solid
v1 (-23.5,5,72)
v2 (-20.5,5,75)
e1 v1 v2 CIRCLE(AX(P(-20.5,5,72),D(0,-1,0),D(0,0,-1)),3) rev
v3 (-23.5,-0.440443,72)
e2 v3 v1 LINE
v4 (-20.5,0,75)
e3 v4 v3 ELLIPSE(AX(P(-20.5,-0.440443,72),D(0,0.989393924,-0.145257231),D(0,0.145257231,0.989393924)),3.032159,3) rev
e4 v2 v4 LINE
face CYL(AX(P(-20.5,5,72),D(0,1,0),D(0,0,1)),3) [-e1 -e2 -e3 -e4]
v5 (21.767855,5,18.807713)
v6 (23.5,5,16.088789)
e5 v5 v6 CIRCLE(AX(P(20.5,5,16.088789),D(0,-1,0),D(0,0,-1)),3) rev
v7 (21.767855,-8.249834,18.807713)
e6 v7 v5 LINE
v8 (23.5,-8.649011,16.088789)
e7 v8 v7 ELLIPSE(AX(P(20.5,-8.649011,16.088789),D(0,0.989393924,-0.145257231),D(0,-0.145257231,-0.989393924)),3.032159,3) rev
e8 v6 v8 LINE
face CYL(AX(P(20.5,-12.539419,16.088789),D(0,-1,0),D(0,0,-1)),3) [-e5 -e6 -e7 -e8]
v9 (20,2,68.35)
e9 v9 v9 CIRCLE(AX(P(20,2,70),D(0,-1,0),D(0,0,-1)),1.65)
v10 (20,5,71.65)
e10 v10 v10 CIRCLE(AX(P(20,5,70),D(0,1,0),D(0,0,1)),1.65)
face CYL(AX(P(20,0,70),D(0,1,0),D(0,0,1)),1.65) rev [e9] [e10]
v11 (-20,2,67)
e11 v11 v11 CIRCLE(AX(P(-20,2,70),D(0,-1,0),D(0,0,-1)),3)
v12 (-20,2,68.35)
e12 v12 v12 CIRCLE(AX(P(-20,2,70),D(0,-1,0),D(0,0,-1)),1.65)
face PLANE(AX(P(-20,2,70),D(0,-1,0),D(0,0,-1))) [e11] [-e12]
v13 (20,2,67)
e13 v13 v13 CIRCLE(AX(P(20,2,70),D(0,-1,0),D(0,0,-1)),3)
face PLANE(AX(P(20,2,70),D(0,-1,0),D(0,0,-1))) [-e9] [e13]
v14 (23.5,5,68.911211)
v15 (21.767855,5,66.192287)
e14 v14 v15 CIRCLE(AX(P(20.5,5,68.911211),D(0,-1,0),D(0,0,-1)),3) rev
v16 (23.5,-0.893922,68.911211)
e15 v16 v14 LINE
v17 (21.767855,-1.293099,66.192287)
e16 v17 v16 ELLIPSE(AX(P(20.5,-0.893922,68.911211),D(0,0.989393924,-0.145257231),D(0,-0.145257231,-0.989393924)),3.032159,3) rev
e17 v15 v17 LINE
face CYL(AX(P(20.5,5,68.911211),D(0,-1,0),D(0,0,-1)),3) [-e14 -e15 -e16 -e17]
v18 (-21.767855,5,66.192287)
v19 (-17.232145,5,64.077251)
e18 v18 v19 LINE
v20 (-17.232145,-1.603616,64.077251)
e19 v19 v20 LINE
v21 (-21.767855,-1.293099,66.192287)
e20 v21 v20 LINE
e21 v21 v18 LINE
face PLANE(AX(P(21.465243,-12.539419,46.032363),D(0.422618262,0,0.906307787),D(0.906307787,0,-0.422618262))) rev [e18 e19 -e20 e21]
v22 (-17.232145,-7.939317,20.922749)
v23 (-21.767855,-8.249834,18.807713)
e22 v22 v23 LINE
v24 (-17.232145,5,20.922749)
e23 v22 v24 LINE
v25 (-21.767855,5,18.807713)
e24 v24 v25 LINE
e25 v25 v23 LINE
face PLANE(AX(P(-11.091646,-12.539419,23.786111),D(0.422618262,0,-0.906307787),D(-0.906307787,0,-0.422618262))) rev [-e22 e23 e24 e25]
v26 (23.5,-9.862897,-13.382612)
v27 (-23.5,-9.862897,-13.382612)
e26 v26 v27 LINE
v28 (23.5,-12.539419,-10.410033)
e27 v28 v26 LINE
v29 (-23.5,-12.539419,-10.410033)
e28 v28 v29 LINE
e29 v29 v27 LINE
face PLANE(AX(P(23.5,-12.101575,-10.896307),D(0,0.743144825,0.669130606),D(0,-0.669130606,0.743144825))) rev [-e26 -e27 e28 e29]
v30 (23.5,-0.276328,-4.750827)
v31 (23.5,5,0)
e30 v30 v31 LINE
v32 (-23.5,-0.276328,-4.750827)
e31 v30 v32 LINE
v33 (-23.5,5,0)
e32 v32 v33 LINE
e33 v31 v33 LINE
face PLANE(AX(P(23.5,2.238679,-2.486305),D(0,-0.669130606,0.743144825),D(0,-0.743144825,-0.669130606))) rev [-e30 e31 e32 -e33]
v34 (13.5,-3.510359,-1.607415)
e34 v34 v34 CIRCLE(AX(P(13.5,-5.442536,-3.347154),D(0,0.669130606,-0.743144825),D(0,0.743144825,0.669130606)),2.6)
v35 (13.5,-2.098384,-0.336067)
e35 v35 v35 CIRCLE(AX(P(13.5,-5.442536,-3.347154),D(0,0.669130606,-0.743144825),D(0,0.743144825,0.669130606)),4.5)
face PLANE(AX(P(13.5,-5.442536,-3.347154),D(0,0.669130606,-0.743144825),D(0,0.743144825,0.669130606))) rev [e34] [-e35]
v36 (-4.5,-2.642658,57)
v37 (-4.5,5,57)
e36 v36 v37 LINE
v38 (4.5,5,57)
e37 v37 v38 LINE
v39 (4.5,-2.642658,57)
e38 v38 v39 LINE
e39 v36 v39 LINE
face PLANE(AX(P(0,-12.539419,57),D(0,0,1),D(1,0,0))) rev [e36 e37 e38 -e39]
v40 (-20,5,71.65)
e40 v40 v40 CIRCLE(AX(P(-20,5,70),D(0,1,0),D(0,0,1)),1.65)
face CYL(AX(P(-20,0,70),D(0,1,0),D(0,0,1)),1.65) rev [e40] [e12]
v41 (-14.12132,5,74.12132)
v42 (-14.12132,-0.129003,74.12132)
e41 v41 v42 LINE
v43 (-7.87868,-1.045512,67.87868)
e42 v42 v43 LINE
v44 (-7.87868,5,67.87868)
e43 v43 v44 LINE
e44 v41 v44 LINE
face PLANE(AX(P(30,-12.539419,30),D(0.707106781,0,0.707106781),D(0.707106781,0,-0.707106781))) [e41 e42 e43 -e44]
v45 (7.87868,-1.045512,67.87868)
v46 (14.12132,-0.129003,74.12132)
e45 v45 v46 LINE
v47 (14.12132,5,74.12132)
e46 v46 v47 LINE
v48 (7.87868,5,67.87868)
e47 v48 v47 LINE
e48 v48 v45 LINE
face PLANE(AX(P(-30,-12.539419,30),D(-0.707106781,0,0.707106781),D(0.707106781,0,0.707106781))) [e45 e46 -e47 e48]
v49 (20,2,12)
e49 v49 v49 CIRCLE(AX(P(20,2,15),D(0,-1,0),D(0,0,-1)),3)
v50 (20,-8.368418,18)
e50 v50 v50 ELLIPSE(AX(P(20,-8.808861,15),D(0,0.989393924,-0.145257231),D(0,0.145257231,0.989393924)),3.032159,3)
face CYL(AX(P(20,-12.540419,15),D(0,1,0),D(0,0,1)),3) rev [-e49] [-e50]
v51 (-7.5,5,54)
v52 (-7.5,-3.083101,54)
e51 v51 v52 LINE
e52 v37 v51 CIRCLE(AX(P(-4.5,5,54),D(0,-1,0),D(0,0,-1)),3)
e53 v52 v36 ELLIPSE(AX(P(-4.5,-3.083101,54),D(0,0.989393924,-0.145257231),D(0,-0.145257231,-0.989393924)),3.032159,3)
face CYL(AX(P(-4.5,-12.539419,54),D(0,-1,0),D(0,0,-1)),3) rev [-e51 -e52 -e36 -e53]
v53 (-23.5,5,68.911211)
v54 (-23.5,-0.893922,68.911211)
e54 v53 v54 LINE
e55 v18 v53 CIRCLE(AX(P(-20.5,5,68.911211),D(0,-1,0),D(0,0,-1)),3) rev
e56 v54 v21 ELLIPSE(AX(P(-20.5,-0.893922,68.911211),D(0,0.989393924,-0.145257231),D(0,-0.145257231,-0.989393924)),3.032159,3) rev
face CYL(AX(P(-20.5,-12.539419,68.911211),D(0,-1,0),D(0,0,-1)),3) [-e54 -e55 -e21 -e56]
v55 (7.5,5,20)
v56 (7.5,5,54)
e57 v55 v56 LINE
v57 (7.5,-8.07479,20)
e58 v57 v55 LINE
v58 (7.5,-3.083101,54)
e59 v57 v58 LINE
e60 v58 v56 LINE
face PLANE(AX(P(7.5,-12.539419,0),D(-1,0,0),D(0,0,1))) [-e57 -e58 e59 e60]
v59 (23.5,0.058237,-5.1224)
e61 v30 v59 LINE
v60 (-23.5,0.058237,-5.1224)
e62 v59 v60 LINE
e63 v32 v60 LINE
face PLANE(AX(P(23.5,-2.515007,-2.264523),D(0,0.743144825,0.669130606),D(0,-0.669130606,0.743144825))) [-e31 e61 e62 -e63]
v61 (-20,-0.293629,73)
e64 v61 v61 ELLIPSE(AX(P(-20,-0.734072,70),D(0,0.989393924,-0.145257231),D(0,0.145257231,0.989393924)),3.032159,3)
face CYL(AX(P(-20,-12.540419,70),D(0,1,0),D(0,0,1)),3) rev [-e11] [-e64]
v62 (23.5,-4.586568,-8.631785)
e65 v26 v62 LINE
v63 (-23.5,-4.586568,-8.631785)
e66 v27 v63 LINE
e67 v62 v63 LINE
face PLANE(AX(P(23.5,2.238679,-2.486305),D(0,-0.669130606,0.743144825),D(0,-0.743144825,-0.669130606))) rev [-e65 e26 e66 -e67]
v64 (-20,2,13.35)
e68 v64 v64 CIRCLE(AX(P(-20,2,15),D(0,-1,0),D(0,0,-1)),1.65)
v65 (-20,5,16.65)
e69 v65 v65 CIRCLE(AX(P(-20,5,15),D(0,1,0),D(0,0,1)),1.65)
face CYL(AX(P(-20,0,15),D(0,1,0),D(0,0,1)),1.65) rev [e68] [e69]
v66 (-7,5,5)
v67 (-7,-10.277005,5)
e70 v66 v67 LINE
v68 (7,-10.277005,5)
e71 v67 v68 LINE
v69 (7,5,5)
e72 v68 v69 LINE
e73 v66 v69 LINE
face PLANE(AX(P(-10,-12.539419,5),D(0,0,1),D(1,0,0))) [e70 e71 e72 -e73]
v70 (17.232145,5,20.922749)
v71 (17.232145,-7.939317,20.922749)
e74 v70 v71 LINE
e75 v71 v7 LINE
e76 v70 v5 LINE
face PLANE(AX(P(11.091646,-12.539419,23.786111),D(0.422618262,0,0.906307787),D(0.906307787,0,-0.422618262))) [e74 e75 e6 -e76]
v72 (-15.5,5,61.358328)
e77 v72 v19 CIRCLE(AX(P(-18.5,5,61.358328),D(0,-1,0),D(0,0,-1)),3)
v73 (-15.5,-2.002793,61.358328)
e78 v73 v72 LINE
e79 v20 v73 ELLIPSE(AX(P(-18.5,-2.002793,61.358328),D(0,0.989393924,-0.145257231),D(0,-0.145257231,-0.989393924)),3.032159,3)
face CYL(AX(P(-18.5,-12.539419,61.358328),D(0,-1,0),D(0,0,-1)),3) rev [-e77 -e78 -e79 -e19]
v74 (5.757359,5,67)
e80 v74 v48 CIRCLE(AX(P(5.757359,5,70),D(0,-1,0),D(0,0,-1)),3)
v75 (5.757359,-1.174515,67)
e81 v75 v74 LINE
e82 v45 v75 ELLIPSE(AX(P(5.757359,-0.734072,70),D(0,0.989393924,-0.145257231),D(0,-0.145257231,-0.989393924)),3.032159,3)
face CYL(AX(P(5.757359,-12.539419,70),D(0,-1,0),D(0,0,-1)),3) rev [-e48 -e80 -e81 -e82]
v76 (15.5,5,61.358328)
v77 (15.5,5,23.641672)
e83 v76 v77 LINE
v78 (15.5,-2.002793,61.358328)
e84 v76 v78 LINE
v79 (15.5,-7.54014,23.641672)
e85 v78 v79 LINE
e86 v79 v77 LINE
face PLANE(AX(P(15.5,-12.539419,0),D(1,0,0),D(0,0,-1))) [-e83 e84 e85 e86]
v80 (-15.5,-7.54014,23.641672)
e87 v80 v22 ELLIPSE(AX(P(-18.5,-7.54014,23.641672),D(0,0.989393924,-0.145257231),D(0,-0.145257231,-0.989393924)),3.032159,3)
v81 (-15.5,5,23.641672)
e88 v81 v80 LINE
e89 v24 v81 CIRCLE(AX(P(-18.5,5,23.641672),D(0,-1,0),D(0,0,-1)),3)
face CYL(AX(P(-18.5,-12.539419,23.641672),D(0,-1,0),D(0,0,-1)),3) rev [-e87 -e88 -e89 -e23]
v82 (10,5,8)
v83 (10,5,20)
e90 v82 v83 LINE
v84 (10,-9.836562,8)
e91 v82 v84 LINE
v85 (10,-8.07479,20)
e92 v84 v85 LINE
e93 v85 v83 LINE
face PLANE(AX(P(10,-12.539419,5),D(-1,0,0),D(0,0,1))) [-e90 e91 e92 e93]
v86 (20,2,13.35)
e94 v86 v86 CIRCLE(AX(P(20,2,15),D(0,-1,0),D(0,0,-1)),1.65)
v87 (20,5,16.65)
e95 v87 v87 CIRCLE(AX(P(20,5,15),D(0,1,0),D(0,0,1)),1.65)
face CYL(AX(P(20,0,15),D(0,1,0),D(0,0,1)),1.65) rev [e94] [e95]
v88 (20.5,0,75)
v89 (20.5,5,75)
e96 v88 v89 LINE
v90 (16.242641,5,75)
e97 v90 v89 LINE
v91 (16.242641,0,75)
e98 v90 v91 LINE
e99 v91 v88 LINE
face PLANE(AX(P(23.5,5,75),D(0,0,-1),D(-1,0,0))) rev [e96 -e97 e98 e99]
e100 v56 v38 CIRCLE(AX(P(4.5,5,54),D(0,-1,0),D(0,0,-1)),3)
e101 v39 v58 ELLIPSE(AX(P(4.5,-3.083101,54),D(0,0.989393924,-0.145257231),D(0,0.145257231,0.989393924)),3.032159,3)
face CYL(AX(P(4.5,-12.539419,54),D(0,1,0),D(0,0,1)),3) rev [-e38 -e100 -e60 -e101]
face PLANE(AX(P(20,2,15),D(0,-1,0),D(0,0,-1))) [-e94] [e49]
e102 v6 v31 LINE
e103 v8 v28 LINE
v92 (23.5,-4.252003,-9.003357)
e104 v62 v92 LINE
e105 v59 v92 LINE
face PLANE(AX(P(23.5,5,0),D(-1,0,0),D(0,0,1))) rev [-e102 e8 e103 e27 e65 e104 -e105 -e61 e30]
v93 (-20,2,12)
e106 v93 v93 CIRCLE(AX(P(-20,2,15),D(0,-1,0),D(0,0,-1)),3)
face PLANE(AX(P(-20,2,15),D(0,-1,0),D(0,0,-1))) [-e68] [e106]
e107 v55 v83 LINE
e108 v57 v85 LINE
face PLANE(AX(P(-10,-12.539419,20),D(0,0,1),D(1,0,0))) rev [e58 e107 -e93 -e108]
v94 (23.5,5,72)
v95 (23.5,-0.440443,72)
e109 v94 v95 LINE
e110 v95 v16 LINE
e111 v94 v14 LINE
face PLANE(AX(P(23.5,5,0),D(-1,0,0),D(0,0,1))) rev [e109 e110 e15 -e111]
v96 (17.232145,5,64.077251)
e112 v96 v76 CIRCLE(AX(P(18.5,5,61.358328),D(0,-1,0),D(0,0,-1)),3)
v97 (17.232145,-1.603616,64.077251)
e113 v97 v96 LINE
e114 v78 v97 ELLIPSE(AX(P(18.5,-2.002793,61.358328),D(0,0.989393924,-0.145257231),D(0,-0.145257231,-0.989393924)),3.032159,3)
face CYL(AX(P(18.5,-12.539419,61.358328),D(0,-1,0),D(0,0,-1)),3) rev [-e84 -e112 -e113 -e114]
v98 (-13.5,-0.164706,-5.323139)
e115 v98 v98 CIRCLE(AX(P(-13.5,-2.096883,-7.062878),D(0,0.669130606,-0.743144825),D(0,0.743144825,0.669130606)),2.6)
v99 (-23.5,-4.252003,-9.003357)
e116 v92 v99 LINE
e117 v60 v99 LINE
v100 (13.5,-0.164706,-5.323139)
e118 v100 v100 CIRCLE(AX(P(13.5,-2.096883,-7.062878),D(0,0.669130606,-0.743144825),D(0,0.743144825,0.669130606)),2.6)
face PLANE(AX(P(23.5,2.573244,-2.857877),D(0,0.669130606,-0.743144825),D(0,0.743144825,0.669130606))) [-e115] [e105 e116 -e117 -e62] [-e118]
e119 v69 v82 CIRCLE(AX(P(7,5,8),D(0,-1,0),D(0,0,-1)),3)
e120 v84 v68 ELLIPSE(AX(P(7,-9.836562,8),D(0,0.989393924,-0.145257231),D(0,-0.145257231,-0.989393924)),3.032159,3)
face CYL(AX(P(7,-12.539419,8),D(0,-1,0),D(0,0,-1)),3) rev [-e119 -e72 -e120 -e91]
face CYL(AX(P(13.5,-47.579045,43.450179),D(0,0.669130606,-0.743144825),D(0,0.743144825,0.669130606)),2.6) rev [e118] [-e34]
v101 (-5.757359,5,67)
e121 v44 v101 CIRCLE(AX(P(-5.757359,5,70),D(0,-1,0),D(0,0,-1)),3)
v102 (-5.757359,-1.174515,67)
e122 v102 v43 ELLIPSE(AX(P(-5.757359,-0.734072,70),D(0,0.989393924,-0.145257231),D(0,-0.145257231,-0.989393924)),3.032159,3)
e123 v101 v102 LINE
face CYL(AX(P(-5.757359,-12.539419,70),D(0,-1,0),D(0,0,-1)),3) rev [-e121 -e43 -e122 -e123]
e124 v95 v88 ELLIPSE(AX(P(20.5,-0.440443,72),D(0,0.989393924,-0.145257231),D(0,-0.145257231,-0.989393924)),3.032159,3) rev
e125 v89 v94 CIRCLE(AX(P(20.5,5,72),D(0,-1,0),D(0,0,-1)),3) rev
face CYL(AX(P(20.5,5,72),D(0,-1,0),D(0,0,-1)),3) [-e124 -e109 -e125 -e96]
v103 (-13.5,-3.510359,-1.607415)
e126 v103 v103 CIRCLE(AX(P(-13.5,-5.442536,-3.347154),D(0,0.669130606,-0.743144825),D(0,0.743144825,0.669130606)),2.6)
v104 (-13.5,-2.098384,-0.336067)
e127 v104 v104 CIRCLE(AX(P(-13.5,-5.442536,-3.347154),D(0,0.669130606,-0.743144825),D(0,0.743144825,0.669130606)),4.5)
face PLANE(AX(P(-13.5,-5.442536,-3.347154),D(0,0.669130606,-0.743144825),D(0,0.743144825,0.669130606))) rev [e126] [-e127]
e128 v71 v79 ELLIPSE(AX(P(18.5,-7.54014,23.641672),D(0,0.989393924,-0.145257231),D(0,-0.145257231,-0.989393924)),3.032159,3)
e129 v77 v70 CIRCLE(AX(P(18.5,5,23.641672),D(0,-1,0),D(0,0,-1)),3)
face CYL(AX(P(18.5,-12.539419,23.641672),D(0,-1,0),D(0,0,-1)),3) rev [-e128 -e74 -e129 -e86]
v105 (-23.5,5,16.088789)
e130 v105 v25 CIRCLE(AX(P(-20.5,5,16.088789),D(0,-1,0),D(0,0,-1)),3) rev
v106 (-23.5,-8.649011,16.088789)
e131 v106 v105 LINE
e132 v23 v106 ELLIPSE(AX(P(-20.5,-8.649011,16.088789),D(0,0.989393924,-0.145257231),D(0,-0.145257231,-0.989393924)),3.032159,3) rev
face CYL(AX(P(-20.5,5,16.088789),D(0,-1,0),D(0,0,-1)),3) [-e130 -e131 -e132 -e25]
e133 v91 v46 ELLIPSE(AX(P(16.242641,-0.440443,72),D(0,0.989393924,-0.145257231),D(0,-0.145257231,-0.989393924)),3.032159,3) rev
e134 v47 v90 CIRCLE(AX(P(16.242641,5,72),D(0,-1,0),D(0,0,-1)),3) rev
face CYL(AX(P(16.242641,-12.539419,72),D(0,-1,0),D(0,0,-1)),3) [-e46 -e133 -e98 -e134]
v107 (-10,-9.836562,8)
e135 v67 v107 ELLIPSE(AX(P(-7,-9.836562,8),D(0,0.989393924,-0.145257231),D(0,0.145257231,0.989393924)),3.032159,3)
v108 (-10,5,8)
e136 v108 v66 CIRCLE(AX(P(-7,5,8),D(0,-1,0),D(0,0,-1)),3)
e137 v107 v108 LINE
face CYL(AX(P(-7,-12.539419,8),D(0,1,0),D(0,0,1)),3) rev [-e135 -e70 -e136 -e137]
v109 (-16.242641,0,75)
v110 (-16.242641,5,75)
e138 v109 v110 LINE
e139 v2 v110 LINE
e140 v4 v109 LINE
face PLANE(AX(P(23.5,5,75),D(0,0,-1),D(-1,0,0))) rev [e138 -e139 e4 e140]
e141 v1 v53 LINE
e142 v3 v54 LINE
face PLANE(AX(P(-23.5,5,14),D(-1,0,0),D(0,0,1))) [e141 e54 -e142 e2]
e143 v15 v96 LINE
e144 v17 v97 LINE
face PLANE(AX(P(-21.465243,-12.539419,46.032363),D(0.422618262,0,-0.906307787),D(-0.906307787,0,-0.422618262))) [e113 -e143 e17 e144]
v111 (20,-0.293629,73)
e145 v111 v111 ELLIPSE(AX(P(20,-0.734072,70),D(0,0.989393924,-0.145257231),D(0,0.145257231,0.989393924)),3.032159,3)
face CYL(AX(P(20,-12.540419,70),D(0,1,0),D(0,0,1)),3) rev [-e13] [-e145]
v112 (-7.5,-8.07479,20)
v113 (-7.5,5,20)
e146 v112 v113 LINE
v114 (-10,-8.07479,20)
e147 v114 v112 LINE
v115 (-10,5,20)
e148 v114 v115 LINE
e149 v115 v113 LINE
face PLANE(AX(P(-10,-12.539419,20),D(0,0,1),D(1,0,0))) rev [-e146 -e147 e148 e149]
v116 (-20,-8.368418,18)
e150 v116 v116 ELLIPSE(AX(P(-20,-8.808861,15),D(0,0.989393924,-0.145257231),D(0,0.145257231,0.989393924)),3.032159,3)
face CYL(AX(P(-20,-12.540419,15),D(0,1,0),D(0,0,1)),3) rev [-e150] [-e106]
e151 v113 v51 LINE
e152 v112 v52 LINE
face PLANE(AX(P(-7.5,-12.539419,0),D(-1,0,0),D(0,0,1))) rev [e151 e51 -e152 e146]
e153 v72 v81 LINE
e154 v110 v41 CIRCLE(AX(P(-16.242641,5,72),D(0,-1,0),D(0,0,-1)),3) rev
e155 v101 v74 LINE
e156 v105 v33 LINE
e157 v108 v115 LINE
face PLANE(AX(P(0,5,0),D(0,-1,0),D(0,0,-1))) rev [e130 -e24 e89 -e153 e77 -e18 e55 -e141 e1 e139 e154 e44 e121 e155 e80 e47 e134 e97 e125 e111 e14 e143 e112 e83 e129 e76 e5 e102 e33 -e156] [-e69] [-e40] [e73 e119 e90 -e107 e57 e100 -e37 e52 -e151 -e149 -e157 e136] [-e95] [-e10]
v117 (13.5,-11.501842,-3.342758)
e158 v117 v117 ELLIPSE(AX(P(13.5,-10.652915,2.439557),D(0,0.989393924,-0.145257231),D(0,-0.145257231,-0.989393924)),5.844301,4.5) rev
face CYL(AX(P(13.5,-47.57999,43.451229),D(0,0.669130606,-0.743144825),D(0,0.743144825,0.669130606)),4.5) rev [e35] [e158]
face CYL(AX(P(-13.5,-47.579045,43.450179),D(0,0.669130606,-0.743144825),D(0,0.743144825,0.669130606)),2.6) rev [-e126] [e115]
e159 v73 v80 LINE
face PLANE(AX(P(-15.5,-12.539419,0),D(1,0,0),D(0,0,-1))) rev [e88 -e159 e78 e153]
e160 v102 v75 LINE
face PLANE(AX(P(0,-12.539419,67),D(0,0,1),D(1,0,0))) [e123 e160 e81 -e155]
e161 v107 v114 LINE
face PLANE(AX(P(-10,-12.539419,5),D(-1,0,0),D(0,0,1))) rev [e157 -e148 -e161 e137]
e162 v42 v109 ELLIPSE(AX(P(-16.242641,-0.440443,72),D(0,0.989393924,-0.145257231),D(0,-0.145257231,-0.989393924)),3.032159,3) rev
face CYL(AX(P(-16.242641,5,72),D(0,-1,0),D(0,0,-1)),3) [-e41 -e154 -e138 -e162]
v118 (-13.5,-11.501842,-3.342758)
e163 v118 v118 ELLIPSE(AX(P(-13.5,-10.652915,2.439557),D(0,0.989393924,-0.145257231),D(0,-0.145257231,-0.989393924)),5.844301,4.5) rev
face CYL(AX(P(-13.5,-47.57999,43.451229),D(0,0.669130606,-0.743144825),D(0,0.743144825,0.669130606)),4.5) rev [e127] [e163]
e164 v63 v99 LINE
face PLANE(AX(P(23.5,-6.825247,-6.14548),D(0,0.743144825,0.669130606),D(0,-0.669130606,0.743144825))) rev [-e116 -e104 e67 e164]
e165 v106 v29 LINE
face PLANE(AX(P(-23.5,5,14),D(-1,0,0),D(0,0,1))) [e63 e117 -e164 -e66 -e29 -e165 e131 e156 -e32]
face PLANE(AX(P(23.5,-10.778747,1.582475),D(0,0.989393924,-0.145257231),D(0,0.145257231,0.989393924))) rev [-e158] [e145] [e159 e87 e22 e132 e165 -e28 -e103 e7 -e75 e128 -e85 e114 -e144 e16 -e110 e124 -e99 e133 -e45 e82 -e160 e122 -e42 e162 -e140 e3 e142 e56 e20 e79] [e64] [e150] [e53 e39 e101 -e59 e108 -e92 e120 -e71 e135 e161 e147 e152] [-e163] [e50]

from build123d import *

# Parameters (mm, degrees)
EXTRUDE_2_DEPTH     = 5
SKETCH_3_R          = 1.65
CUT_EXTRUDE_1_DEPTH = 79.754364958
EXTRUDE_3_DEPTH     = 23.5
SKETCH_6_R          = 2.6
CUT_EXTRUDE_3_DEPTH = 83.719354566
CUT_EXTRUDE_4_REACH = 89.719
CUT_EXTRUDE_START   = -5
SKETCH_7_R          = 4.5
CUT_EXTRUDE_5_REACH = 85.529
CUT_EXTRUDE_START_2 = 3
SKETCH_8_R          = 3
CUT_EXTRUDE_2_DEPTH = 81.528760183
FILLET_1_R          = 3


with BuildPart() as part:
    # 草图2 → 凸台-拉伸2 (new body)
    with BuildSketch(Plane(origin=(0, 0, 0), x_dir=(1, 0, 0), z_dir=(0, 1, 0))):
        Polygon((0, 0), (23.5, 0), (23.5, -14), (23.5, -75), (0, -75), align=None)
    extrude_2 = extrude(amount=EXTRUDE_2_DEPTH)

    # 镜向1: 凸台-拉伸2 across plane
    add(extrude_2.mirror(Plane(origin=(0, 5, 75), x_dir=(0, 0, 1), z_dir=(1, 0, 0))))

    # 草图3 → 切除-拉伸1 (cut, through all)
    with BuildSketch(Plane(origin=(0, 5, 0), x_dir=(1, 0, 0), z_dir=(0, 1, 0))):
        with Locations(Location((-20, -15, 0), (0, 0, 270))):
            Circle(SKETCH_3_R)
        with Locations(Location((20, -15, 0), (0, 0, 270))):
            Circle(SKETCH_3_R)
        with Locations(Location((-20, -70, 0), (0, 0, 270))):
            Circle(SKETCH_3_R)
        with Locations(Location((20, -70, 0), (0, 0, 270))):
            Circle(SKETCH_3_R)
    extrude(amount=-CUT_EXTRUDE_1_DEPTH, mode=Mode.SUBTRACT)

    # 草图5 → 凸台-拉伸3 (add, symmetric)
    with BuildSketch(Plane(origin=(0, 0, 0), x_dir=(0, 0, -1), z_dir=(1, 0, 0))):
        Polygon((-75, 0), (10.410032825, -12.539418935), (13.382612127, -9.86289651), (0, 5), (0, 0), align=None)
        Polygon((4.750827305, -0.276328261), (8.631784822, -4.586568249), (9.003357235, -4.252002945), (5.122399718, 0.058237042), align=None)
    extrude(amount=EXTRUDE_3_DEPTH, both=True)

    # 草图6 → 切除-拉伸3 (cut, through all)
    with BuildSketch(Plane(origin=(0, 2.573244145, -2.857877151), x_dir=(1, 0, 0), z_dir=(0, 0.6691306063588544, -0.7431448254773979))):
        with Locations(Location((-13.5, 6.284275873, 0), (0, 0, 270))):
            Circle(SKETCH_6_R)
        with Locations(Location((13.5, 6.284275873, 0), (0, 0, 270))):
            Circle(SKETCH_6_R)
    extrude(amount=-CUT_EXTRUDE_3_DEPTH, mode=Mode.SUBTRACT)

    # 切除-拉伸4: up to this plane
    cut_extrude_4_end = Plane(origin=(23.5, -10.778746663, 1.582474746), z_dir=(0, 0.9893939239349117, -0.145257231423012))
    # 草图7 → 切除-拉伸4 (cut, up to the surface)
    with BuildSketch(Plane(origin=(0, 2.573244145, -2.857877151), x_dir=(1, 0, 0), z_dir=(0, 0.6691306063588544, -0.7431448254773979)).offset(CUT_EXTRUDE_START), mode=Mode.PRIVATE) as cut_extrude_4_sk1:
        with Locations(Location((-13.5, 6.284275873, 0), (0, 0, 270))):
            Circle(SKETCH_7_R)
    cut_extrude_4_tool1 = split(extrude(cut_extrude_4_sk1.sketch, amount=-CUT_EXTRUDE_4_REACH, mode=Mode.PRIVATE), bisect_by=cut_extrude_4_end, keep=Keep.BOTH, mode=Mode.PRIVATE)
    add(cut_extrude_4_tool1.solids().sort_by_distance((-13.5, -5.442536, -3.347154))[0], mode=Mode.SUBTRACT)
    # 草图7 → 切除-拉伸4 (cut, up to the surface)
    with BuildSketch(Plane(origin=(0, 2.573244145, -2.857877151), x_dir=(1, 0, 0), z_dir=(0, 0.6691306063588544, -0.7431448254773979)).offset(CUT_EXTRUDE_START), mode=Mode.PRIVATE) as cut_extrude_4_sk2:
        with Locations(Location((13.5, 6.284275873, 0), (0, 0, 270))):
            Circle(SKETCH_7_R)
    cut_extrude_4_tool2 = split(extrude(cut_extrude_4_sk2.sketch, amount=-CUT_EXTRUDE_4_REACH, mode=Mode.PRIVATE), bisect_by=cut_extrude_4_end, keep=Keep.BOTH, mode=Mode.PRIVATE)
    add(cut_extrude_4_tool2.solids().sort_by_distance((13.5, -5.442536, -3.347154))[0], mode=Mode.SUBTRACT)

    # 切除-拉伸5: up to this plane
    cut_extrude_5_end = Plane(origin=(23.5, -10.778746663, 1.582474746), z_dir=(0, 0.9893939239349117, -0.145257231423012))
    # 草图8 → 切除-拉伸5 (cut, up to the surface)
    with BuildSketch(Plane.XZ.offset(-5).offset(CUT_EXTRUDE_START_2), mode=Mode.PRIVATE) as cut_extrude_5_sk1:
        with Locations(Location((-20, 15, 0), (0, 0, 90))):
            Circle(SKETCH_8_R)
    cut_extrude_5_tool1 = split(extrude(cut_extrude_5_sk1.sketch, amount=CUT_EXTRUDE_5_REACH, mode=Mode.PRIVATE), bisect_by=cut_extrude_5_end, keep=Keep.BOTH, mode=Mode.PRIVATE)
    add(cut_extrude_5_tool1.solids().sort_by_distance((-20, 2, 15))[0], mode=Mode.SUBTRACT)
    # 草图8 → 切除-拉伸5 (cut, up to the surface)
    with BuildSketch(Plane.XZ.offset(-5).offset(CUT_EXTRUDE_START_2), mode=Mode.PRIVATE) as cut_extrude_5_sk2:
        with Locations(Location((20, 15, 0), (0, 0, 90))):
            Circle(SKETCH_8_R)
    cut_extrude_5_tool2 = split(extrude(cut_extrude_5_sk2.sketch, amount=CUT_EXTRUDE_5_REACH, mode=Mode.PRIVATE), bisect_by=cut_extrude_5_end, keep=Keep.BOTH, mode=Mode.PRIVATE)
    add(cut_extrude_5_tool2.solids().sort_by_distance((20, 2, 15))[0], mode=Mode.SUBTRACT)
    # 草图8 → 切除-拉伸5 (cut, up to the surface)
    with BuildSketch(Plane.XZ.offset(-5).offset(CUT_EXTRUDE_START_2), mode=Mode.PRIVATE) as cut_extrude_5_sk3:
        with Locations(Location((20, 70, 0), (0, 0, 90))):
            Circle(SKETCH_8_R)
    cut_extrude_5_tool3 = split(extrude(cut_extrude_5_sk3.sketch, amount=CUT_EXTRUDE_5_REACH, mode=Mode.PRIVATE), bisect_by=cut_extrude_5_end, keep=Keep.BOTH, mode=Mode.PRIVATE)
    add(cut_extrude_5_tool3.solids().sort_by_distance((20, 2, 70))[0], mode=Mode.SUBTRACT)
    # 草图8 → 切除-拉伸5 (cut, up to the surface)
    with BuildSketch(Plane.XZ.offset(-5).offset(CUT_EXTRUDE_START_2), mode=Mode.PRIVATE) as cut_extrude_5_sk4:
        with Locations(Location((-20, 70, 0), (0, 0, 90))):
            Circle(SKETCH_8_R)
    cut_extrude_5_tool4 = split(extrude(cut_extrude_5_sk4.sketch, amount=CUT_EXTRUDE_5_REACH, mode=Mode.PRIVATE), bisect_by=cut_extrude_5_end, keep=Keep.BOTH, mode=Mode.PRIVATE)
    add(cut_extrude_5_tool4.solids().sort_by_distance((-20, 2, 70))[0], mode=Mode.SUBTRACT)

    # 草图4 → 切除-拉伸2 (cut, through all)
    with BuildSketch(Plane(origin=(0, 5, 0), x_dir=(1, 0, 0), z_dir=(0, 1, 0))):
        Polygon((-10, -5), (-10, -20), (-7.5, -20), (-7.5, -57), (7.5, -57), (7.5, -20), (10, -20), (10, -5), align=None)
        Polygon((-7, -67), (-15, -75), (15, -75), (7, -67), align=None)
        Polygon((-23.5, -18), (-23.5, -67), (-15.5, -63.269538735), (-15.5, -21.730461265), align=None)
        Polygon((23.5, -18), (15.5, -21.730461265), (15.5, -63.269538735), (23.5, -67), align=None)
    extrude(amount=-CUT_EXTRUDE_2_DEPTH, mode=Mode.SUBTRACT)

    # 圆角1
    # the kernel refuses this fillet: 3 mm, written as the material it adds along each edge
    with BuildSketch(Plane(origin=(-15.5, 5, 21.730461265), x_dir=(-0.9063077870366472, 0, -0.42261826174070566), z_dir=(0, -1, 0))) as fillet_1_piece_1_section:
        with BuildLine():
            CenterArc((FILLET_1_R * 0.637070260807, -FILLET_1_R), FILLET_1_R, 90, 65)
            Line((-FILLET_1_R * 0.269237526229, -FILLET_1_R * 0.577381738259), (0, 0))
            Line((0, 0), (FILLET_1_R * 0.637070260807, 0))
        make_face()
    fillet_1_piece_1 = extrude(amount=17.598759961, mode=Mode.PRIVATE)
    fillet_1_piece_1 = split(fillet_1_piece_1, bisect_by=Plane(origin=(-15.879555916, -7.651082655, 22.886004601), z_dir=(0, 0.9893939239349115, -0.14525723142301197)), keep=Keep.TOP, mode=Mode.PRIVATE)
    add(fillet_1_piece_1)
    with BuildSketch(Plane(origin=(-15.5, 5, 63.269538735), x_dir=(0, 0, -1), z_dir=(0, -1, 0))) as fillet_1_piece_2_section:
        with BuildLine():
            CenterArc((FILLET_1_R * 0.637070260807, -FILLET_1_R), FILLET_1_R, 90, 65)
            Line((-FILLET_1_R * 0.269237526229, -FILLET_1_R * 0.577381738259), (0, 0))
            Line((0, 0), (FILLET_1_R * 0.637070260807, 0))
        make_face()
    fillet_1_piece_2 = extrude(amount=11.500227068, mode=Mode.PRIVATE)
    fillet_1_piece_2 = split(fillet_1_piece_2, bisect_by=Plane(origin=(-15.87363951, -1.687245158, 63.507628217), z_dir=(0, 0.9893939239349115, -0.14525723142301197)), keep=Keep.TOP, mode=Mode.PRIVATE)
    add(fillet_1_piece_2)
    with BuildSketch(Plane(origin=(7.5, 5, 57), x_dir=(0, 0, -1), z_dir=(0, -1, 0))) as fillet_1_piece_3_section:
        with BuildLine():
            CenterArc((FILLET_1_R, -FILLET_1_R), FILLET_1_R, 90, 90)
            Line((0, -FILLET_1_R), (0, 0))
            Line((0, 0), (FILLET_1_R, 0))
        make_face()
    fillet_1_piece_3 = extrude(amount=15.142658402, mode=Mode.PRIVATE)
    fillet_1_piece_3 = split(fillet_1_piece_3, bisect_by=Plane(origin=(6.825500476, -2.66184405, 56.869320354), z_dir=(0, 0.9893939239349115, -0.14525723142301197)), keep=Keep.TOP, mode=Mode.PRIVATE)
    add(fillet_1_piece_3)
    with BuildSketch(Plane(origin=(-7.5, 5, 57), x_dir=(1, 0, 0), z_dir=(0, -1, 0))) as fillet_1_piece_4_section:
        with BuildLine():
            CenterArc((FILLET_1_R, -FILLET_1_R), FILLET_1_R, 90, 90)
            Line((0, -FILLET_1_R), (0, 0))
            Line((0, 0), (FILLET_1_R, 0))
        make_face()
    fillet_1_piece_4 = extrude(amount=15.142658402, mode=Mode.PRIVATE)
    fillet_1_piece_4 = split(fillet_1_piece_4, bisect_by=Plane(origin=(-6.825500476, -2.66184405, 56.869320354), z_dir=(0, 0.9893939239349115, -0.14525723142301197)), keep=Keep.TOP, mode=Mode.PRIVATE)
    add(fillet_1_piece_4)
    with BuildSketch(Plane(origin=(-10, 5, 5), x_dir=(1, 0, 0), z_dir=(0, -1, 0))) as fillet_1_piece_5_section:
        with BuildLine():
            CenterArc((FILLET_1_R, FILLET_1_R), FILLET_1_R, 180, 90)
            Line((0, FILLET_1_R), (0, 0))
            Line((0, 0), (FILLET_1_R, 0))
        make_face()
    fillet_1_piece_5 = extrude(amount=21.652323405, mode=Mode.PRIVATE)
    fillet_1_piece_5 = split(fillet_1_piece_5, bisect_by=Plane(origin=(-9.315353327, -10.016611336, 6.773624645), z_dir=(0, 0.9893939239349115, -0.14525723142301197)), keep=Keep.TOP, mode=Mode.PRIVATE)
    fillet_1_piece_5 = fillet_1_piece_5 - Plane(origin=(-13.5, -8.634898015, 0.198322875), x_dir=(0, 0.7431448254773979, 0.6691306063588544), z_dir=(0, 0.6691306063588544, -0.7431448254773979)) * Cylinder(4.5, 56, mode=Mode.PRIVATE)
    add(fillet_1_piece_5)
    with BuildSketch(Plane(origin=(10, 5, 5), x_dir=(-1, 0, 0), z_dir=(0, -1, 0))) as fillet_1_piece_6_section:
        with BuildLine():
            CenterArc((FILLET_1_R, -FILLET_1_R), FILLET_1_R, 90, 90)
            Line((0, -FILLET_1_R), (0, 0))
            Line((0, 0), (FILLET_1_R, 0))
        make_face()
    fillet_1_piece_6 = extrude(amount=21.652323405, mode=Mode.PRIVATE)
    fillet_1_piece_6 = split(fillet_1_piece_6, bisect_by=Plane(origin=(9.315353327, -10.016611336, 6.773624643), z_dir=(0, 0.9893939239349115, -0.14525723142301197)), keep=Keep.TOP, mode=Mode.PRIVATE)
    fillet_1_piece_6 = fillet_1_piece_6 - Plane(origin=(13.5, -8.634898017, 0.198322878), x_dir=(0, 0.7431448254773979, 0.6691306063588544), z_dir=(0, 0.6691306063588544, -0.7431448254773979)) * Cylinder(4.5, 56, mode=Mode.PRIVATE)
    add(fillet_1_piece_6)
    with BuildSketch(Plane(origin=(7, 5, 67), x_dir=(-1, 0, 0), z_dir=(0, -1, 0))) as fillet_1_piece_7_section:
        with BuildLine():
            CenterArc((FILLET_1_R * 0.414213562373, -FILLET_1_R), FILLET_1_R, 90, 45)
            Line((-FILLET_1_R * 0.292893218813, -FILLET_1_R * 0.292893218813), (0, 0))
            Line((0, 0), (FILLET_1_R * 0.414213562373, 0))
        make_face()
    fillet_1_piece_7 = extrude(amount=9.281116563, mode=Mode.PRIVATE)
    fillet_1_piece_7 = split(fillet_1_piece_7, bisect_by=Plane(origin=(6.92099422, -1.082611782, 67.625981449), z_dir=(0, 0.9893939239349115, -0.14525723142301197)), keep=Keep.TOP, mode=Mode.PRIVATE)
    add(fillet_1_piece_7)
    with BuildSketch(Plane(origin=(-7, 5, 67), x_dir=(-0.7071067811865526, 0, 0.7071067811865426), z_dir=(0, -1, 0))) as fillet_1_piece_8_section:
        with BuildLine():
            CenterArc((FILLET_1_R * 0.414213562373, -FILLET_1_R), FILLET_1_R, 90, 45)
            Line((-FILLET_1_R * 0.292893218813, -FILLET_1_R * 0.292893218813), (0, 0))
            Line((0, 0), (FILLET_1_R * 0.414213562373, 0))
        make_face()
    fillet_1_piece_8 = extrude(amount=9.281116563, mode=Mode.PRIVATE)
    fillet_1_piece_8 = split(fillet_1_piece_8, bisect_by=Plane(origin=(-6.92099422, -1.082611782, 67.625981449), z_dir=(0, 0.9893939239349115, -0.14525723142301197)), keep=Keep.TOP, mode=Mode.PRIVATE)
    add(fillet_1_piece_8)
    with BuildSketch(Plane(origin=(15.5, 5, 63.269538735), x_dir=(0.9063077870366488, 0, 0.4226182617407019), z_dir=(0, -1, 0))) as fillet_1_piece_9_section:
        with BuildLine():
            CenterArc((FILLET_1_R * 0.637070260807, -FILLET_1_R), FILLET_1_R, 90, 65)
            Line((-FILLET_1_R * 0.269237526229, -FILLET_1_R * 0.577381738259), (0, 0))
            Line((0, 0), (FILLET_1_R * 0.637070260807, 0))
        make_face()
    fillet_1_piece_9 = extrude(amount=11.500227068, mode=Mode.PRIVATE)
    fillet_1_piece_9 = split(fillet_1_piece_9, bisect_by=Plane(origin=(15.87363951, -1.687245158, 63.507628217), z_dir=(0, 0.9893939239349115, -0.14525723142301197)), keep=Keep.TOP, mode=Mode.PRIVATE)
    add(fillet_1_piece_9)
    with BuildSketch(Plane(origin=(15.5, 5, 21.730461265), x_dir=(0.9063077870366475, 0, -0.4226182617407048), z_dir=(0, -1, 0))) as fillet_1_piece_10_section:
        with BuildLine():
            CenterArc((FILLET_1_R * 0.637070260807, FILLET_1_R), FILLET_1_R, 205, 65)
            Line((-FILLET_1_R * 0.269237526229, FILLET_1_R * 0.577381738259), (0, 0))
            Line((0, 0), (FILLET_1_R * 0.637070260807, 0))
        make_face()
    fillet_1_piece_10 = extrude(amount=17.598759961, mode=Mode.PRIVATE)
    fillet_1_piece_10 = split(fillet_1_piece_10, bisect_by=Plane(origin=(15.879555916, -7.651082655, 22.886004601), z_dir=(0, 0.9893939239349115, -0.14525723142301197)), keep=Keep.TOP, mode=Mode.PRIVATE)
    add(fillet_1_piece_10)
    # the kernel refuses this fillet: 3 mm, written as the material it takes off along each edge
    with BuildSketch(Plane(origin=(-23.5, 9.778026956, 67), x_dir=(0.9063077870366487, 0, -0.4226182617407022), z_dir=(0, -1, 0)), Plane(origin=(23.5, 9.778026956, 67), x_dir=(0, 0, 1), z_dir=(0, -1, 0))) as fillet_1_2_piece_1:
        with BuildLine():
            CenterArc((FILLET_1_R * 0.637070260807, FILLET_1_R), FILLET_1_R, 205, 65)
            Line((-FILLET_1_R * 0.269237526229, FILLET_1_R * 0.577381738259), (0, 0))
            Line((0, 0), (FILLET_1_R * 0.637070260807, 0))
        make_face()
    extrude(amount=15.730568757, mode=Mode.SUBTRACT)
    with BuildSketch(Plane(origin=(-23.5, 9.778026956, 18), x_dir=(0, 0, -1), z_dir=(0, -1, 0))) as fillet_1_2_piece_2:
        with BuildLine():
            CenterArc((FILLET_1_R * 0.637070260807, FILLET_1_R), FILLET_1_R, 205, 65)
            Line((-FILLET_1_R * 0.269237526229, FILLET_1_R * 0.577381738259), (0, 0))
            Line((0, 0), (FILLET_1_R * 0.637070260807, 0))
        make_face()
    extrude(amount=22.924472184, mode=Mode.SUBTRACT)
    with BuildSketch(Plane(origin=(15, 8.106601718, 75), x_dir=(-0.7071067811865526, 0, -0.7071067811865426), z_dir=(0, -1, 0)), Plane(origin=(-15, 8.106601718, 75), x_dir=(-1, 0, 0), z_dir=(0, -1, 0))) as fillet_1_2_piece_3:
        with BuildLine():
            CenterArc((FILLET_1_R * 0.414213562373, FILLET_1_R), FILLET_1_R, 225, 45)
            Line((-FILLET_1_R * 0.292893218813, FILLET_1_R * 0.292893218813), (0, 0))
            Line((0, 0), (FILLET_1_R * 0.414213562373, 0))
        make_face()
    extrude(amount=11.213203436, mode=Mode.SUBTRACT)
    with BuildSketch(Plane(origin=(-23.5, -7.5, 75), x_dir=(1, 0, 0), z_dir=(0, 1, 0))) as fillet_1_2_piece_4:
        with BuildLine():
            CenterArc((FILLET_1_R, FILLET_1_R), FILLET_1_R, 180, 90)
            Line((0, FILLET_1_R), (0, 0))
            Line((0, 0), (FILLET_1_R, 0))
        make_face()
    extrude(amount=20, mode=Mode.SUBTRACT)
    with BuildSketch(Plane(origin=(23.5, 9.778026956, 18), x_dir=(0, 0, -1), z_dir=(0, -1, 0))) as fillet_1_2_piece_5:
        with BuildLine():
            CenterArc((FILLET_1_R * 0.637070260807, -FILLET_1_R), FILLET_1_R, 90, 65)
            Line((-FILLET_1_R * 0.269237526229, -FILLET_1_R * 0.577381738259), (0, 0))
            Line((0, 0), (FILLET_1_R * 0.637070260807, 0))
        make_face()
    extrude(amount=22.924472184, mode=Mode.SUBTRACT)
    with BuildSketch(Plane(origin=(23.5, -7.5, 75), x_dir=(-1, 0, 0), z_dir=(0, 1, 0))) as fillet_1_2_piece_6:
        with BuildLine():
            CenterArc((FILLET_1_R, -FILLET_1_R), FILLET_1_R, 90, 90)
            Line((0, -FILLET_1_R), (0, 0))
            Line((0, 0), (FILLET_1_R, 0))
        make_face()
    extrude(amount=20, mode=Mode.SUBTRACT)


solid = part.part
